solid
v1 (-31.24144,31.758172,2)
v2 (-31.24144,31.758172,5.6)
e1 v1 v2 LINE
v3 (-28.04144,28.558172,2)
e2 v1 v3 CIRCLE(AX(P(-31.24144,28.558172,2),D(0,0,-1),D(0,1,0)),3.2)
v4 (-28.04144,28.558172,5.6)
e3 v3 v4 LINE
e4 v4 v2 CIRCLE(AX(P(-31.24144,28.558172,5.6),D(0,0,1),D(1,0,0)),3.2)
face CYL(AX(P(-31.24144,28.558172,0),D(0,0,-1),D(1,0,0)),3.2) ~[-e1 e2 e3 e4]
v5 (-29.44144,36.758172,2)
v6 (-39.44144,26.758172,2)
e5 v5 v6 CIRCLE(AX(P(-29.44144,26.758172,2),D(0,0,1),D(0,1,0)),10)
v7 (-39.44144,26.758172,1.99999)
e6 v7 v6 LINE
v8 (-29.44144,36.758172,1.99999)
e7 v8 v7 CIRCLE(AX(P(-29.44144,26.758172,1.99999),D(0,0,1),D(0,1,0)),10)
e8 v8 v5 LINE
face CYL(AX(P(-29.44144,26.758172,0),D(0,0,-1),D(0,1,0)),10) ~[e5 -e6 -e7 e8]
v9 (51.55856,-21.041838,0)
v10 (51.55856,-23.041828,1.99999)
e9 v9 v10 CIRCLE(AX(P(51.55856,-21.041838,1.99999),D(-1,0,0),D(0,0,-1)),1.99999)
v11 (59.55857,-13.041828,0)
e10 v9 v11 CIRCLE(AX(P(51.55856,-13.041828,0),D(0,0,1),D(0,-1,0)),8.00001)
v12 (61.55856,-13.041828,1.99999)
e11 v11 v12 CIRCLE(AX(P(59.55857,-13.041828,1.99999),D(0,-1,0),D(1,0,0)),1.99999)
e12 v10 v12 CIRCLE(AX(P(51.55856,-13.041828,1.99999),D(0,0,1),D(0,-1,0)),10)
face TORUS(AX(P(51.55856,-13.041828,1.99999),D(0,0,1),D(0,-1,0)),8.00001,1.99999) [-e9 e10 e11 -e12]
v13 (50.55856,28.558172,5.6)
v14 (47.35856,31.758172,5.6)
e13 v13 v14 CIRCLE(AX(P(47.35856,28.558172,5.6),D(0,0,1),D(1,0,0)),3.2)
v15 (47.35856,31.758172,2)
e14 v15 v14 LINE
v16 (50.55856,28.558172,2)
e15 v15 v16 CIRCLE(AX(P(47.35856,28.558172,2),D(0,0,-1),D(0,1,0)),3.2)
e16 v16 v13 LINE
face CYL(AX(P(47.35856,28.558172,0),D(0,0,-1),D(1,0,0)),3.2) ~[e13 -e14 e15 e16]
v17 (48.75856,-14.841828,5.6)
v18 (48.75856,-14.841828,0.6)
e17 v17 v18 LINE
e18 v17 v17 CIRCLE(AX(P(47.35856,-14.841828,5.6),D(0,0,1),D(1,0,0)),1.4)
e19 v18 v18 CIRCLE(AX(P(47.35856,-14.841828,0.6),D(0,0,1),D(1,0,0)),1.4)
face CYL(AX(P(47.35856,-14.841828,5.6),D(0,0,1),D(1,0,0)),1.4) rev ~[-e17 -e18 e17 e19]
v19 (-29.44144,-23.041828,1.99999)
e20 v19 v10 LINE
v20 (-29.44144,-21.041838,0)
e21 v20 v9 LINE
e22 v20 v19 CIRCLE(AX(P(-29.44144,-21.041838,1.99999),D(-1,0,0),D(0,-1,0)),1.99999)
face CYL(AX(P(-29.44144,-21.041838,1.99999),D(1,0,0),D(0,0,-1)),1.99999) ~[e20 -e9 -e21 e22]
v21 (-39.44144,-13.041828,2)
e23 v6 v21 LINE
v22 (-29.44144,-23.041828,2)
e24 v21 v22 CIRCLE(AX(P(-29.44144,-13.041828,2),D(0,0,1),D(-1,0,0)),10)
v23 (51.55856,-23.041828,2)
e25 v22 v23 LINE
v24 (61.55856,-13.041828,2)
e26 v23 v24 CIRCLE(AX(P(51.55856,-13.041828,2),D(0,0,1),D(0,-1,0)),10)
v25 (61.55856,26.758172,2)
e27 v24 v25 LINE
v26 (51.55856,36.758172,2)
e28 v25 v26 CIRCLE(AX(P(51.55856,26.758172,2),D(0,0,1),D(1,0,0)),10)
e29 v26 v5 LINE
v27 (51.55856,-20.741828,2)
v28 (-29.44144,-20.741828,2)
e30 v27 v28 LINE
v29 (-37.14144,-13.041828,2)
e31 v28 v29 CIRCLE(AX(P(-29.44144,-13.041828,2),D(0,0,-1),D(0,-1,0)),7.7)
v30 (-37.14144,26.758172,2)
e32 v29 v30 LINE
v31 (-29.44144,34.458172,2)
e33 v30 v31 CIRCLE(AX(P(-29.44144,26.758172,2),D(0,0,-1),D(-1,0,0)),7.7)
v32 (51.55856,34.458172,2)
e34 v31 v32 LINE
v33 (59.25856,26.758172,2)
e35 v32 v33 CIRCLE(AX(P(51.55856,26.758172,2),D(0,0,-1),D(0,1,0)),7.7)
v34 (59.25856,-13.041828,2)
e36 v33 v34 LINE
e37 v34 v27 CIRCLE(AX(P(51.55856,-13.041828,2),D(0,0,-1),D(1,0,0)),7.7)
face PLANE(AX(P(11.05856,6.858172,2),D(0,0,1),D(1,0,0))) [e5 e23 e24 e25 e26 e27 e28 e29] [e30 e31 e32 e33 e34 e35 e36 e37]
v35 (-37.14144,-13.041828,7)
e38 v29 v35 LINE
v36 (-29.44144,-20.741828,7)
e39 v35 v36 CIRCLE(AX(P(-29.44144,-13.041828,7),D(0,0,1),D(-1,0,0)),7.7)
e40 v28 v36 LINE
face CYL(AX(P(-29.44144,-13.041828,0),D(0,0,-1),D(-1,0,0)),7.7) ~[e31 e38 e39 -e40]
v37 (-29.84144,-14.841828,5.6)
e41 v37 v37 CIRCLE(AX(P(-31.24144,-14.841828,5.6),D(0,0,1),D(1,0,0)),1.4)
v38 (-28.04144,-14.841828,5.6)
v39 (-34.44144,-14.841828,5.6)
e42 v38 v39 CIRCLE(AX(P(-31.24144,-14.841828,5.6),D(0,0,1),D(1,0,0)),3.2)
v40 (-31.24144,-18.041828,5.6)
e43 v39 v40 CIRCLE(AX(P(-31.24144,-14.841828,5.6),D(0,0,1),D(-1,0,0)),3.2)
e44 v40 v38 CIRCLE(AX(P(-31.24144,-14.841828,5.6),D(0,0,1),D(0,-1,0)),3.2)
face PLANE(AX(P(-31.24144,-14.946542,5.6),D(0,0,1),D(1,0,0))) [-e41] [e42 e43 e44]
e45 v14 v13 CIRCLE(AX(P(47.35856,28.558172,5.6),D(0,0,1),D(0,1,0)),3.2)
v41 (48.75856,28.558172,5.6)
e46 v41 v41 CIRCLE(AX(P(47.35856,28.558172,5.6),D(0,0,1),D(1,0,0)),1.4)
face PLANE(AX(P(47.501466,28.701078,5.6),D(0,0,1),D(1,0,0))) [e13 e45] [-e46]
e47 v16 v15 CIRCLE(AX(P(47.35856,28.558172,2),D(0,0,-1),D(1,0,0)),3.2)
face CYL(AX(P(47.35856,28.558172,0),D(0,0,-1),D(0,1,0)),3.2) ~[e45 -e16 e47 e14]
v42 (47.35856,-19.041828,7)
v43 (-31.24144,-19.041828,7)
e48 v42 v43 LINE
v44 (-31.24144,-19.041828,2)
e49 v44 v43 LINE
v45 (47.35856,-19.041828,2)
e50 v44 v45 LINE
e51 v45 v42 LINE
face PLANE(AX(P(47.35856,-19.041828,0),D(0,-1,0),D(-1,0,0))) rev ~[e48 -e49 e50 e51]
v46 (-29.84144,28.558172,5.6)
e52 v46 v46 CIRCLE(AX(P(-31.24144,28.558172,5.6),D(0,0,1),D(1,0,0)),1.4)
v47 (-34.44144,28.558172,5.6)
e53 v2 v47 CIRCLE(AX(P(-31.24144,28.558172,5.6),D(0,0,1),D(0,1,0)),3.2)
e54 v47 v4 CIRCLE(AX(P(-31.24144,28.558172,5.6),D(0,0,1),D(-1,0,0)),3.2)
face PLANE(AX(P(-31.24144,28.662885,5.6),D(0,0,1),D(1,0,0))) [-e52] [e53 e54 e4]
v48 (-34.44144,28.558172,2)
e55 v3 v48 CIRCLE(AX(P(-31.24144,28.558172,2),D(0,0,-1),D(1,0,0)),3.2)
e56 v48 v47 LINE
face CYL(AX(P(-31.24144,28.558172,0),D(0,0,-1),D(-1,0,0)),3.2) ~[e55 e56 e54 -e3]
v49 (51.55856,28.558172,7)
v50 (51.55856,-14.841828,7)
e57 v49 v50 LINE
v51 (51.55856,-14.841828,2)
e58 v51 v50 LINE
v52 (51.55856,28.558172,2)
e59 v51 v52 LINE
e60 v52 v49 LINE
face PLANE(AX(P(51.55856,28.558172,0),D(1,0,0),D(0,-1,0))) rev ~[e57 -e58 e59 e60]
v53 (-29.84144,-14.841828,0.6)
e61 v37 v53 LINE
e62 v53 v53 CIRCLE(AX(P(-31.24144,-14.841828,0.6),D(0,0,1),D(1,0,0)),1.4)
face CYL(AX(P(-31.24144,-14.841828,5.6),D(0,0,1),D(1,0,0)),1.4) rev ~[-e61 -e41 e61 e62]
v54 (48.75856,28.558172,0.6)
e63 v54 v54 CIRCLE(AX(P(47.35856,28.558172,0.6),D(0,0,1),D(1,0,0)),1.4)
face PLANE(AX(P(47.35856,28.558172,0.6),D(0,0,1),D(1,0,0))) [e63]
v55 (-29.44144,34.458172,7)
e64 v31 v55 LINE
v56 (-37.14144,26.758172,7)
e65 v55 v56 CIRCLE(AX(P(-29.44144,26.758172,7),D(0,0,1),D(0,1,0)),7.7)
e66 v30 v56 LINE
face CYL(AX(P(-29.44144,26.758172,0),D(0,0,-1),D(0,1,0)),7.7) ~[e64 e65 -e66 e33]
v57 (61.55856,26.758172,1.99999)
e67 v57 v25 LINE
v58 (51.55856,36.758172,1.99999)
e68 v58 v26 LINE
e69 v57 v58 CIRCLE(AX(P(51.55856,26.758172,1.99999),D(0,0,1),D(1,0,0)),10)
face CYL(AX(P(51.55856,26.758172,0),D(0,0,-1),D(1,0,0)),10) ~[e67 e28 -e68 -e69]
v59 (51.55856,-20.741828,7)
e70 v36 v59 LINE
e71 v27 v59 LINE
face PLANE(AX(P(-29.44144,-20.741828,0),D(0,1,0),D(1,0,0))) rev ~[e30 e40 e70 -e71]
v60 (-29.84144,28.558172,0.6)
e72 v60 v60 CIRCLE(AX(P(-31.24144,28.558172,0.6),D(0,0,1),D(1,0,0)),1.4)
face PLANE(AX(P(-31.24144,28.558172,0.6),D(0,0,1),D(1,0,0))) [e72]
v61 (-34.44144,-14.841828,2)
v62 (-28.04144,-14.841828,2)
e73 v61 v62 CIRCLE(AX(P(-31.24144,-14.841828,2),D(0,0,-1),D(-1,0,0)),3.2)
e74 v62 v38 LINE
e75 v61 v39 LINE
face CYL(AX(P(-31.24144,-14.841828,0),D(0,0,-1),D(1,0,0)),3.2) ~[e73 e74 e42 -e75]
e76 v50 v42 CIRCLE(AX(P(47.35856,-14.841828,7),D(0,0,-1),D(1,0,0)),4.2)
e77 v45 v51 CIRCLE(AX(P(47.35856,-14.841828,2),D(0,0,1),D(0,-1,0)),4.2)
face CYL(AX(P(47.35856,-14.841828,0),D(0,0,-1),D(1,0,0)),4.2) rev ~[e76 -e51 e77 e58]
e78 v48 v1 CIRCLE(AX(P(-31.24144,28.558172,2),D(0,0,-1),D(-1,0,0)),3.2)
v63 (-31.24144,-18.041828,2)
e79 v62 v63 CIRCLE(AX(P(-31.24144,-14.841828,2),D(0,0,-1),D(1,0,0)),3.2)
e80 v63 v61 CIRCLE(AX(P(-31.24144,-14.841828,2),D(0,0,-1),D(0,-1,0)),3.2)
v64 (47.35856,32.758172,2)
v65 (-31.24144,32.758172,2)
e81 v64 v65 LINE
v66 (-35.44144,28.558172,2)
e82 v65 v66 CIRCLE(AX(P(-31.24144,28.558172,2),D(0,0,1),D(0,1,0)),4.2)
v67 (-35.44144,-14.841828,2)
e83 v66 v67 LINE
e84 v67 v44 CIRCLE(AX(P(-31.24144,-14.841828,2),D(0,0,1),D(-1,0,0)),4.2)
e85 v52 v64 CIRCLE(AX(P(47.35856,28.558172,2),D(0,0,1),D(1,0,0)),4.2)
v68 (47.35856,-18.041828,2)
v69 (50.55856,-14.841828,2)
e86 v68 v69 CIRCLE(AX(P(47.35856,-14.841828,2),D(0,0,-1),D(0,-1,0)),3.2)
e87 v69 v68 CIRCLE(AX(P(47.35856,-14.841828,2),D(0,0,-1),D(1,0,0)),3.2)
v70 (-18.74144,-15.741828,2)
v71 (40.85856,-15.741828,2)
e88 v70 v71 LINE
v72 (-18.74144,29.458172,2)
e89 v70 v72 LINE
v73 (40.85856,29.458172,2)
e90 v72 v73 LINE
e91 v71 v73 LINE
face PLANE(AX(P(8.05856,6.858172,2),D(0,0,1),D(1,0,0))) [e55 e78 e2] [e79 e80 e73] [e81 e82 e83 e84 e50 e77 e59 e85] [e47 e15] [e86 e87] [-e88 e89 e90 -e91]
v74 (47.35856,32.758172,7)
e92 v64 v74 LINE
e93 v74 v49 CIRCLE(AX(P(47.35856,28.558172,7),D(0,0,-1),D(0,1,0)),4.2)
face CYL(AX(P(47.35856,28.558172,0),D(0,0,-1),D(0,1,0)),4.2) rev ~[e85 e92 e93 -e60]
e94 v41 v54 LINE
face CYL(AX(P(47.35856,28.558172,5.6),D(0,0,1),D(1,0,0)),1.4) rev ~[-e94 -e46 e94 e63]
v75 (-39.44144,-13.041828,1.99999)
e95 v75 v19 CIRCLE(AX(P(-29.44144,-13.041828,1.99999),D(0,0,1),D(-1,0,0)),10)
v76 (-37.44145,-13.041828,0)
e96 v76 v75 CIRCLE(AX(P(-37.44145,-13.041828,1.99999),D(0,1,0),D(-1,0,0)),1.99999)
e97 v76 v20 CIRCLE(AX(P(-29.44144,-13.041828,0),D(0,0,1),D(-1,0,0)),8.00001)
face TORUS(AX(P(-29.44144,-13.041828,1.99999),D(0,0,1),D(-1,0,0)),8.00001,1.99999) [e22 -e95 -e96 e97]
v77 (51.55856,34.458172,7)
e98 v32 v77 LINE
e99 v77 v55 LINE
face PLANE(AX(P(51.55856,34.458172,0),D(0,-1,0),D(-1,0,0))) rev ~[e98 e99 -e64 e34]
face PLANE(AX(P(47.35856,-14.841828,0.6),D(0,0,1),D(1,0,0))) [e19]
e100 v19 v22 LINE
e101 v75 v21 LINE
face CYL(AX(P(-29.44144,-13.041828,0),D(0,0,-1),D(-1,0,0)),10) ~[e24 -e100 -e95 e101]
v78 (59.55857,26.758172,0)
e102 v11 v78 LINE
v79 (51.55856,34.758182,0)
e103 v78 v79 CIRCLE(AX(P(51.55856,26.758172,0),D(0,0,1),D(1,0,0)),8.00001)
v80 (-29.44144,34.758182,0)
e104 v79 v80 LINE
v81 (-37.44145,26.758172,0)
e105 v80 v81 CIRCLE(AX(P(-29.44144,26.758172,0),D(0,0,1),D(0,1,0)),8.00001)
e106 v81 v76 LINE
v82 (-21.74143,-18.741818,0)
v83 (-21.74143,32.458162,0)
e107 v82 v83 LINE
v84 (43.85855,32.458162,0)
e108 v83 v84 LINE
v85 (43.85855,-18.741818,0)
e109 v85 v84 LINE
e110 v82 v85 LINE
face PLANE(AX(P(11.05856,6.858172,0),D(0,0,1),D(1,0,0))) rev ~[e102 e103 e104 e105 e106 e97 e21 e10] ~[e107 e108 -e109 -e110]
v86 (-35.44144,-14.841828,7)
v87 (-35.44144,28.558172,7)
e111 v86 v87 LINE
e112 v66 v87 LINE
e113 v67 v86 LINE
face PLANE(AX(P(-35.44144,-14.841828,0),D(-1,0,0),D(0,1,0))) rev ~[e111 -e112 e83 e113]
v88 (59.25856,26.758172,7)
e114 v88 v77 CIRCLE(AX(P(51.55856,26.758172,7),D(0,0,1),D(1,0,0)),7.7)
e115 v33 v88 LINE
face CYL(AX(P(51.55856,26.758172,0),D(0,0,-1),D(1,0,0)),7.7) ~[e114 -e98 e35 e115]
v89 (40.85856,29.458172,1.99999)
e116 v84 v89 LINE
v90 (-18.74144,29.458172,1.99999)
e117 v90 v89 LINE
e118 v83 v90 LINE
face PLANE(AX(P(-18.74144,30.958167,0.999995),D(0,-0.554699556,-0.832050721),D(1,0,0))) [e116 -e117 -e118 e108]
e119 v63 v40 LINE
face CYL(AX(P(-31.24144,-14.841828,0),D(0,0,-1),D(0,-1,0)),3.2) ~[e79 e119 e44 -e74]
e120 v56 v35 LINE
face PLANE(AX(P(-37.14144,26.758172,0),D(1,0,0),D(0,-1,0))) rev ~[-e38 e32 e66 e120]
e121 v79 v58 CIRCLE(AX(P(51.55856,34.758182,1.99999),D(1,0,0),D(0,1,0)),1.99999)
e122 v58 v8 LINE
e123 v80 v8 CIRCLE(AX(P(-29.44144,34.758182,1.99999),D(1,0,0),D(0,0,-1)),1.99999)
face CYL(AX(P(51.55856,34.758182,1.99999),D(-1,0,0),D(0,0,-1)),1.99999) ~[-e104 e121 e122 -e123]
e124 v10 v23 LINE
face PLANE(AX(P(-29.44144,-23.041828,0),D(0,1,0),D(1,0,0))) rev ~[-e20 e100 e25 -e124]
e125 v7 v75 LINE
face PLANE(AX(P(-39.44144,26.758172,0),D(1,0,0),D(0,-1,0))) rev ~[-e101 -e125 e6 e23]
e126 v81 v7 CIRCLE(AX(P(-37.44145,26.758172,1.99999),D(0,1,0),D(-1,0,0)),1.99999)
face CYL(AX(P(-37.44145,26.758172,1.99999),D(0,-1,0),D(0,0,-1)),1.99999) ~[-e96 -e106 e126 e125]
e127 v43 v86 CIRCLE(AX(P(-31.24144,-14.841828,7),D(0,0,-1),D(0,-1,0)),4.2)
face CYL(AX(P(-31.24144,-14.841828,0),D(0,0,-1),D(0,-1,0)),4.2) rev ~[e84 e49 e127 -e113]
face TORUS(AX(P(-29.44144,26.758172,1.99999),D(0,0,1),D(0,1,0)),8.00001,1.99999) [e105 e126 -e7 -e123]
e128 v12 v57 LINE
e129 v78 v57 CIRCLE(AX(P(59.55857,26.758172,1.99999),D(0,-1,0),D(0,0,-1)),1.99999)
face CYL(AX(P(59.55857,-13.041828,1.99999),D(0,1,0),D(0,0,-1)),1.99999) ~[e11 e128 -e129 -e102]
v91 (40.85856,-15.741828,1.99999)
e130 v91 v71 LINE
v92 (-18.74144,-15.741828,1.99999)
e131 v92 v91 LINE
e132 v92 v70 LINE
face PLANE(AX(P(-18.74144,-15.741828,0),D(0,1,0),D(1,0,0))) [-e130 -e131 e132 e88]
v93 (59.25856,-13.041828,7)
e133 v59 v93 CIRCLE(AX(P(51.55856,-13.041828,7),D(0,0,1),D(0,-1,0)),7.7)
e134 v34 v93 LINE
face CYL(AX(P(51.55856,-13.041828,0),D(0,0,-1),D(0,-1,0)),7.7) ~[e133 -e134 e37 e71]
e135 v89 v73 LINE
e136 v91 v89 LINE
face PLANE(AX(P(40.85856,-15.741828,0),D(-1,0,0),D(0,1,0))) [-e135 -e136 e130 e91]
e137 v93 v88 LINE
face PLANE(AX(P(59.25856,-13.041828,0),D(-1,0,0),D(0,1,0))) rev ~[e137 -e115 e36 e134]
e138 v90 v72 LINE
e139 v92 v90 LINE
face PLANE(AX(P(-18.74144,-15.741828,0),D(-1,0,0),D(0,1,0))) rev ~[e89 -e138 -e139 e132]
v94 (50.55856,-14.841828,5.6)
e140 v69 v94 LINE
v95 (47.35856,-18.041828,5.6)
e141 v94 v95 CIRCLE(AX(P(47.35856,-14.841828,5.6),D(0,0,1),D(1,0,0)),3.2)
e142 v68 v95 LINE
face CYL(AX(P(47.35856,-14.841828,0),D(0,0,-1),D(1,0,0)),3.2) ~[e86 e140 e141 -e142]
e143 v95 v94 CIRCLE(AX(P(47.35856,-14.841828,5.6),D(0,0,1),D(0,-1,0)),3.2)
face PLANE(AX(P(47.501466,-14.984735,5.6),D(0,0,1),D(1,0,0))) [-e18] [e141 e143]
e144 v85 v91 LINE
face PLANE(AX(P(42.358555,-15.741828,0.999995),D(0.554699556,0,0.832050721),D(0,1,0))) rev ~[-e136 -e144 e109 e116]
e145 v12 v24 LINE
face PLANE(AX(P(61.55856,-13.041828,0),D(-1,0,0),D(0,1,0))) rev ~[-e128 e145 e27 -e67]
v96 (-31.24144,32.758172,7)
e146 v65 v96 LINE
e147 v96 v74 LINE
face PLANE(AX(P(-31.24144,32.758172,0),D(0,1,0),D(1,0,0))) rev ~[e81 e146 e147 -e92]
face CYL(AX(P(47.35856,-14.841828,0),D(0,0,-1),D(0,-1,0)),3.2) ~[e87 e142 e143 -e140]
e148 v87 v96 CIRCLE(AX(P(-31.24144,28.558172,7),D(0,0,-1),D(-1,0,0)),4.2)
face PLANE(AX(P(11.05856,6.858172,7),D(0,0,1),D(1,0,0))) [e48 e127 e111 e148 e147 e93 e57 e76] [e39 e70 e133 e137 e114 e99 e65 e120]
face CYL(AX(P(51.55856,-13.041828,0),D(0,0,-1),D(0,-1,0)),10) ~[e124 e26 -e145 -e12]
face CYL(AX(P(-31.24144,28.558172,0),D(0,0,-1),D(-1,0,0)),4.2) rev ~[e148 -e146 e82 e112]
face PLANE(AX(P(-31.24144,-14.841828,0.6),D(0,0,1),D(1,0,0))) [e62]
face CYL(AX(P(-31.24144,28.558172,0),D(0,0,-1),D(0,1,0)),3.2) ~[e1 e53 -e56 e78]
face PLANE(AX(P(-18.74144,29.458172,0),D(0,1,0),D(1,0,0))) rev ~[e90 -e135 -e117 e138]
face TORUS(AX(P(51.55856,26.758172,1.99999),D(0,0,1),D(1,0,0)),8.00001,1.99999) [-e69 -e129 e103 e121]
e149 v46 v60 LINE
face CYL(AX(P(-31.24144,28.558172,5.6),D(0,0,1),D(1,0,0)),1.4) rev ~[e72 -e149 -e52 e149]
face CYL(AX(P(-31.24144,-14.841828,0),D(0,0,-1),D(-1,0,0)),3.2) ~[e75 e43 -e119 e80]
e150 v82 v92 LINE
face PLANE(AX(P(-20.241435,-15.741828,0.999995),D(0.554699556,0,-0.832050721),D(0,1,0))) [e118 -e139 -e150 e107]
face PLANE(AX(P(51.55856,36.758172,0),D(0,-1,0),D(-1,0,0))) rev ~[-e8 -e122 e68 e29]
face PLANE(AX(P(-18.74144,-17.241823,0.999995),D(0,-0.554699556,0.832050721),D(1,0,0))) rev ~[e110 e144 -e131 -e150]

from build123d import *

# Parameters (mm, degrees)
F1_DEPTH = 5.6
F2_DEPTH = 7
F0_W     = 59.6
F0_H     = 45.2
F3_DEPTH = 2
F4_R     = 1.99999
F5_SIZE2 = 1.99999
F5_SIZE  = 2.99999
F6_R     = 1.4
F7_DEPTH = 5


# Not quite as in the source:
# - a fillet or chamfer is up to 0.001 mm smaller than in the source, because OpenCascade refuses the exact size


with BuildPart() as f1:
    # F0 (on Top) → F1 (new body)
    with BuildSketch(Plane.XY):
        with BuildLine():
            ThreePointArc((-34.4414402544, 28.5581715763), (-31.2414402544, 25.3581715763), (-28.0414402544, 28.5581715763))
            ThreePointArc((-28.0414402544, 28.5581715763), (-28.9786985547, 30.8209132761), (-31.2414402544, 31.7581715763))
            ThreePointArc((-31.2414402544, 31.7581715763), (-33.5041819542, 30.8209132761), (-34.4414402544, 28.5581715763))
        make_face()
    extrude(amount=F1_DEPTH)



with BuildPart() as f1b:
    # F0 (on Top) → F1, piece 2 (new body)
    with BuildSketch(Plane.XY):
        with BuildLine():
            ThreePointArc((-28.0414402544, -14.8418284237), (-31.2414402544, -11.6418284237), (-34.4414402544, -14.8418284237))
            ThreePointArc((-34.4414402544, -14.8418284237), (-33.5041819542, -17.1045701235), (-31.2414402544, -18.0418284237))
            ThreePointArc((-31.2414402544, -18.0418284237), (-28.9786985547, -17.1045701235), (-28.0414402544, -14.8418284237))
        make_face()
    extrude(amount=F1_DEPTH)


with BuildPart() as f1c:
    # F0 (on Top) → F1, piece 3 (new body)
    with BuildSketch(Plane.XY):
        with BuildLine():
            ThreePointArc((47.3585597456, -18.0418284237), (49.6213014453, -17.1045701235), (50.5585597456, -14.8418284237))
            ThreePointArc((50.5585597456, -14.8418284237), (45.0958180458, -12.5790867239), (47.3585597456, -18.0418284237))
        make_face()
    extrude(amount=F1_DEPTH)


with BuildPart() as f1d:
    # F0 (on Top) → F1, piece 4 (new body)
    with BuildSketch(Plane.XY):
        with BuildLine():
            ThreePointArc((50.5585597456, 28.5581715763), (49.6213014453, 30.8209132761), (47.3585597456, 31.7581715763))
            ThreePointArc((47.3585597456, 31.7581715763), (45.0958180458, 26.2954298765), (50.5585597456, 28.5581715763))
        make_face()
    extrude(amount=F1_DEPTH)


with BuildPart() as f2:
    # F0 (on Top) → F2 (new body)
    with BuildSketch(Plane.XY):
        with BuildLine():
            Line((51.5585597456, 34.4581715763), (-29.4414402544, 34.4581715763))
            ThreePointArc((-29.4414402544, 34.4581715763), (-34.8861624696, 32.2028937914), (-37.1414402544, 26.7581715763))
            Line((-37.1414402544, 26.7581715763), (-37.1414402544, -13.0418284237))
            ThreePointArc((-37.1414402544, -13.0418284237), (-34.8861624696, -18.4865506389), (-29.4414402544, -20.7418284237))
            Line((-29.4414402544, -20.7418284237), (51.5585597456, -20.7418284237))
            ThreePointArc((51.5585597456, -20.7418284237), (57.0032819607, -18.4865506389), (59.2585597456, -13.0418284237))
            Line((59.2585597456, -13.0418284237), (59.2585597456, 26.7581715763))
            ThreePointArc((59.2585597456, 26.7581715763), (57.0032819607, 32.2028937914), (51.5585597456, 34.4581715763))
        make_face()
        with BuildLine():
            ThreePointArc((47.3585597456, 32.7581715763), (50.3284082265, 31.5280200572), (51.5585597456, 28.5581715763))
            Line((51.5585597456, 28.5581715763), (51.5585597456, -14.8418284237))
            ThreePointArc((51.5585597456, -14.8418284237), (50.3284082265, -17.8116769047), (47.3585597456, -19.0418284237))
            Line((47.3585597456, -19.0418284237), (-31.2414402544, -19.0418284237))
            ThreePointArc((-31.2414402544, -19.0418284237), (-34.2112887354, -17.8116769047), (-35.4414402544, -14.8418284237))
            Line((-35.4414402544, -14.8418284237), (-35.4414402544, 28.5581715763))
            ThreePointArc((-35.4414402544, 28.5581715763), (-34.2112887354, 31.5280200572), (-31.2414402544, 32.7581715763))
            Line((-31.2414402544, 32.7581715763), (47.3585597456, 32.7581715763))
        make_face(mode=Mode.SUBTRACT)
    extrude(amount=F2_DEPTH)


with BuildPart() as f1_1:
    add(f1.part)

    add(f1b.part)  # F3 merges F1b

    add(f1c.part)  # F3 merges F1c

    add(f1d.part)  # F3 merges F1d

    add(f2.part)  # F3 merges F2
    # F0 (on Top) → F3 (join)
    with BuildSketch(Plane.XY):
        with BuildLine():
            Line((51.5585597456, 36.7581715763), (-29.4414402544, 36.7581715763))
            ThreePointArc((-29.4414402544, 36.7581715763), (-36.5125080663, 33.8292393881), (-39.4414402544, 26.7581715763))
            Line((-39.4414402544, 26.7581715763), (-39.4414402544, -13.0418284237))
            ThreePointArc((-39.4414402544, -13.0418284237), (-36.5125080663, -20.1128962356), (-29.4414402544, -23.0418284237))
            Line((-29.4414402544, -23.0418284237), (51.5585597456, -23.0418284237))
            ThreePointArc((51.5585597456, -23.0418284237), (58.6296275574, -20.1128962356), (61.5585597456, -13.0418284237))
            Line((61.5585597456, -13.0418284237), (61.5585597456, 26.7581715763))
            ThreePointArc((61.5585597456, 26.7581715763), (58.6296275574, 33.8292393881), (51.5585597456, 36.7581715763))
        make_face()
        with BuildLine():
            ThreePointArc((-37.1414402544, 26.7581715763), (-34.8861624696, 32.2028937914), (-29.4414402544, 34.4581715763))
            Line((-29.4414402544, 34.4581715763), (51.5585597456, 34.4581715763))
            ThreePointArc((51.5585597456, 34.4581715763), (57.0032819607, 32.2028937914), (59.2585597456, 26.7581715763))
            Line((59.2585597456, 26.7581715763), (59.2585597456, -13.0418284237))
            ThreePointArc((59.2585597456, -13.0418284237), (57.0032819607, -18.4865506389), (51.5585597456, -20.7418284237))
            Line((51.5585597456, -20.7418284237), (-29.4414402544, -20.7418284237))
            ThreePointArc((-29.4414402544, -20.7418284237), (-34.8861624696, -18.4865506389), (-37.1414402544, -13.0418284237))
            Line((-37.1414402544, -13.0418284237), (-37.1414402544, 26.7581715763))
        make_face(mode=Mode.SUBTRACT)
        with BuildLine():
            Line((51.5585597456, -14.8418284237), (51.5585597456, 28.5581715763))
            ThreePointArc((51.5585597456, 28.5581715763), (50.3284082265, 31.5280200572), (47.3585597456, 32.7581715763))
            Line((47.3585597456, 32.7581715763), (-31.2414402544, 32.7581715763))
            ThreePointArc((-31.2414402544, 32.7581715763), (-34.2112887354, 31.5280200572), (-35.4414402544, 28.5581715763))
            Line((-35.4414402544, 28.5581715763), (-35.4414402544, -14.8418284237))
            ThreePointArc((-35.4414402544, -14.8418284237), (-34.2112887354, -17.8116769047), (-31.2414402544, -19.0418284237))
            Line((-31.2414402544, -19.0418284237), (47.3585597456, -19.0418284237))
            ThreePointArc((47.3585597456, -19.0418284237), (50.3284082265, -17.8116769047), (51.5585597456, -14.8418284237))
        make_face()
        with BuildLine():
            ThreePointArc((-34.4414402544, 28.5581715763), (-33.5041819542, 30.8209132761), (-31.2414402544, 31.7581715763))
            Line((-31.2414402544, 31.7581715763), (47.3585597456, 31.7581715763))
            ThreePointArc((47.3585597456, 31.7581715763), (49.6213014453, 30.8209132761), (50.5585597456, 28.5581715763))
            Line((50.5585597456, 28.5581715763), (50.5585597456, -14.8418284237))
            ThreePointArc((50.5585597456, -14.8418284237), (49.6213014453, -17.1045701235), (47.3585597456, -18.0418284237))
            Line((47.3585597456, -18.0418284237), (-31.2414402544, -18.0418284237))
            ThreePointArc((-31.2414402544, -18.0418284237), (-33.5041819542, -17.1045701235), (-34.4414402544, -14.8418284237))
            Line((-34.4414402544, -14.8418284237), (-34.4414402544, 28.5581715763))
        make_face(mode=Mode.SUBTRACT)
        with BuildLine():
            ThreePointArc((-31.2414402544, 31.7581715763), (-28.9786985547, 30.8209132761), (-28.0414402544, 28.5581715763))
            ThreePointArc((-28.0414402544, 28.5581715763), (-31.2414402544, 25.3581715763), (-34.4414402544, 28.5581715763))
            Line((-34.4414402544, 28.5581715763), (-34.4414402544, -14.8418284237))
            ThreePointArc((-34.4414402544, -14.8418284237), (-31.2414402544, -11.6418284237), (-28.0414402544, -14.8418284237))
            ThreePointArc((-28.0414402544, -14.8418284237), (-28.9786985547, -17.1045701235), (-31.2414402544, -18.0418284237))
            Line((-31.2414402544, -18.0418284237), (47.3585597456, -18.0418284237))
            ThreePointArc((47.3585597456, -18.0418284237), (45.0958180458, -12.5790867239), (50.5585597456, -14.8418284237))
            Line((50.5585597456, -14.8418284237), (50.5585597456, 28.5581715763))
            ThreePointArc((50.5585597456, 28.5581715763), (45.0958180458, 26.2954298765), (47.3585597456, 31.7581715763))
            Line((47.3585597456, 31.7581715763), (-31.2414402544, 31.7581715763))
        make_face()
        with Locations((11.0585597456, 6.8581715763)):
            Rectangle(F0_W, F0_H, mode=Mode.SUBTRACT)
    extrude(amount=F3_DEPTH)

    # F4 (radius 2 in the source; OpenCascade refuses exactly that, so slightly less here)
    f4_edges = [f1_1.edges().sort_by_distance(p)[0] for p in [
        (-36.512508, -20.112896, 0),
    ]]
    fillet(f4_edges, radius=F4_R)

    # F5 (size 3 and 2 in the source; OpenCascade refuses exactly that, so slightly less here)
    f5_edges = [f1_1.edges().sort_by_distance(p)[0] for p in [
        (11.05856, 29.458172, 0),
        (-18.74144, 6.858172, 0),
        (11.05856, -15.741828, 0),
        (40.85856, 6.858172, 0),
    ]]
    f5_side = f1_1.faces().sort_by_distance((-34.307016, -17.907405, 0))[0]
    chamfer(f5_edges, length=F5_SIZE, length2=F5_SIZE2, reference=f5_side)

    # F6 (on face) → F7 (cut)
    with BuildSketch(Plane.XY.offset(5.6)):
        with Locations((-31.2414402544, 28.5581715763)):
            Circle(F6_R)
        with Locations((-31.2414402544, -14.8418284237)):
            Circle(F6_R)
        with Locations((47.3585597456, -14.8418284237)):
            Circle(F6_R)
        with Locations((47.3585597456, 28.5581715763)):
            Circle(F6_R)
    extrude(amount=-F7_DEPTH, mode=Mode.SUBTRACT)


solid = f1_1.part
